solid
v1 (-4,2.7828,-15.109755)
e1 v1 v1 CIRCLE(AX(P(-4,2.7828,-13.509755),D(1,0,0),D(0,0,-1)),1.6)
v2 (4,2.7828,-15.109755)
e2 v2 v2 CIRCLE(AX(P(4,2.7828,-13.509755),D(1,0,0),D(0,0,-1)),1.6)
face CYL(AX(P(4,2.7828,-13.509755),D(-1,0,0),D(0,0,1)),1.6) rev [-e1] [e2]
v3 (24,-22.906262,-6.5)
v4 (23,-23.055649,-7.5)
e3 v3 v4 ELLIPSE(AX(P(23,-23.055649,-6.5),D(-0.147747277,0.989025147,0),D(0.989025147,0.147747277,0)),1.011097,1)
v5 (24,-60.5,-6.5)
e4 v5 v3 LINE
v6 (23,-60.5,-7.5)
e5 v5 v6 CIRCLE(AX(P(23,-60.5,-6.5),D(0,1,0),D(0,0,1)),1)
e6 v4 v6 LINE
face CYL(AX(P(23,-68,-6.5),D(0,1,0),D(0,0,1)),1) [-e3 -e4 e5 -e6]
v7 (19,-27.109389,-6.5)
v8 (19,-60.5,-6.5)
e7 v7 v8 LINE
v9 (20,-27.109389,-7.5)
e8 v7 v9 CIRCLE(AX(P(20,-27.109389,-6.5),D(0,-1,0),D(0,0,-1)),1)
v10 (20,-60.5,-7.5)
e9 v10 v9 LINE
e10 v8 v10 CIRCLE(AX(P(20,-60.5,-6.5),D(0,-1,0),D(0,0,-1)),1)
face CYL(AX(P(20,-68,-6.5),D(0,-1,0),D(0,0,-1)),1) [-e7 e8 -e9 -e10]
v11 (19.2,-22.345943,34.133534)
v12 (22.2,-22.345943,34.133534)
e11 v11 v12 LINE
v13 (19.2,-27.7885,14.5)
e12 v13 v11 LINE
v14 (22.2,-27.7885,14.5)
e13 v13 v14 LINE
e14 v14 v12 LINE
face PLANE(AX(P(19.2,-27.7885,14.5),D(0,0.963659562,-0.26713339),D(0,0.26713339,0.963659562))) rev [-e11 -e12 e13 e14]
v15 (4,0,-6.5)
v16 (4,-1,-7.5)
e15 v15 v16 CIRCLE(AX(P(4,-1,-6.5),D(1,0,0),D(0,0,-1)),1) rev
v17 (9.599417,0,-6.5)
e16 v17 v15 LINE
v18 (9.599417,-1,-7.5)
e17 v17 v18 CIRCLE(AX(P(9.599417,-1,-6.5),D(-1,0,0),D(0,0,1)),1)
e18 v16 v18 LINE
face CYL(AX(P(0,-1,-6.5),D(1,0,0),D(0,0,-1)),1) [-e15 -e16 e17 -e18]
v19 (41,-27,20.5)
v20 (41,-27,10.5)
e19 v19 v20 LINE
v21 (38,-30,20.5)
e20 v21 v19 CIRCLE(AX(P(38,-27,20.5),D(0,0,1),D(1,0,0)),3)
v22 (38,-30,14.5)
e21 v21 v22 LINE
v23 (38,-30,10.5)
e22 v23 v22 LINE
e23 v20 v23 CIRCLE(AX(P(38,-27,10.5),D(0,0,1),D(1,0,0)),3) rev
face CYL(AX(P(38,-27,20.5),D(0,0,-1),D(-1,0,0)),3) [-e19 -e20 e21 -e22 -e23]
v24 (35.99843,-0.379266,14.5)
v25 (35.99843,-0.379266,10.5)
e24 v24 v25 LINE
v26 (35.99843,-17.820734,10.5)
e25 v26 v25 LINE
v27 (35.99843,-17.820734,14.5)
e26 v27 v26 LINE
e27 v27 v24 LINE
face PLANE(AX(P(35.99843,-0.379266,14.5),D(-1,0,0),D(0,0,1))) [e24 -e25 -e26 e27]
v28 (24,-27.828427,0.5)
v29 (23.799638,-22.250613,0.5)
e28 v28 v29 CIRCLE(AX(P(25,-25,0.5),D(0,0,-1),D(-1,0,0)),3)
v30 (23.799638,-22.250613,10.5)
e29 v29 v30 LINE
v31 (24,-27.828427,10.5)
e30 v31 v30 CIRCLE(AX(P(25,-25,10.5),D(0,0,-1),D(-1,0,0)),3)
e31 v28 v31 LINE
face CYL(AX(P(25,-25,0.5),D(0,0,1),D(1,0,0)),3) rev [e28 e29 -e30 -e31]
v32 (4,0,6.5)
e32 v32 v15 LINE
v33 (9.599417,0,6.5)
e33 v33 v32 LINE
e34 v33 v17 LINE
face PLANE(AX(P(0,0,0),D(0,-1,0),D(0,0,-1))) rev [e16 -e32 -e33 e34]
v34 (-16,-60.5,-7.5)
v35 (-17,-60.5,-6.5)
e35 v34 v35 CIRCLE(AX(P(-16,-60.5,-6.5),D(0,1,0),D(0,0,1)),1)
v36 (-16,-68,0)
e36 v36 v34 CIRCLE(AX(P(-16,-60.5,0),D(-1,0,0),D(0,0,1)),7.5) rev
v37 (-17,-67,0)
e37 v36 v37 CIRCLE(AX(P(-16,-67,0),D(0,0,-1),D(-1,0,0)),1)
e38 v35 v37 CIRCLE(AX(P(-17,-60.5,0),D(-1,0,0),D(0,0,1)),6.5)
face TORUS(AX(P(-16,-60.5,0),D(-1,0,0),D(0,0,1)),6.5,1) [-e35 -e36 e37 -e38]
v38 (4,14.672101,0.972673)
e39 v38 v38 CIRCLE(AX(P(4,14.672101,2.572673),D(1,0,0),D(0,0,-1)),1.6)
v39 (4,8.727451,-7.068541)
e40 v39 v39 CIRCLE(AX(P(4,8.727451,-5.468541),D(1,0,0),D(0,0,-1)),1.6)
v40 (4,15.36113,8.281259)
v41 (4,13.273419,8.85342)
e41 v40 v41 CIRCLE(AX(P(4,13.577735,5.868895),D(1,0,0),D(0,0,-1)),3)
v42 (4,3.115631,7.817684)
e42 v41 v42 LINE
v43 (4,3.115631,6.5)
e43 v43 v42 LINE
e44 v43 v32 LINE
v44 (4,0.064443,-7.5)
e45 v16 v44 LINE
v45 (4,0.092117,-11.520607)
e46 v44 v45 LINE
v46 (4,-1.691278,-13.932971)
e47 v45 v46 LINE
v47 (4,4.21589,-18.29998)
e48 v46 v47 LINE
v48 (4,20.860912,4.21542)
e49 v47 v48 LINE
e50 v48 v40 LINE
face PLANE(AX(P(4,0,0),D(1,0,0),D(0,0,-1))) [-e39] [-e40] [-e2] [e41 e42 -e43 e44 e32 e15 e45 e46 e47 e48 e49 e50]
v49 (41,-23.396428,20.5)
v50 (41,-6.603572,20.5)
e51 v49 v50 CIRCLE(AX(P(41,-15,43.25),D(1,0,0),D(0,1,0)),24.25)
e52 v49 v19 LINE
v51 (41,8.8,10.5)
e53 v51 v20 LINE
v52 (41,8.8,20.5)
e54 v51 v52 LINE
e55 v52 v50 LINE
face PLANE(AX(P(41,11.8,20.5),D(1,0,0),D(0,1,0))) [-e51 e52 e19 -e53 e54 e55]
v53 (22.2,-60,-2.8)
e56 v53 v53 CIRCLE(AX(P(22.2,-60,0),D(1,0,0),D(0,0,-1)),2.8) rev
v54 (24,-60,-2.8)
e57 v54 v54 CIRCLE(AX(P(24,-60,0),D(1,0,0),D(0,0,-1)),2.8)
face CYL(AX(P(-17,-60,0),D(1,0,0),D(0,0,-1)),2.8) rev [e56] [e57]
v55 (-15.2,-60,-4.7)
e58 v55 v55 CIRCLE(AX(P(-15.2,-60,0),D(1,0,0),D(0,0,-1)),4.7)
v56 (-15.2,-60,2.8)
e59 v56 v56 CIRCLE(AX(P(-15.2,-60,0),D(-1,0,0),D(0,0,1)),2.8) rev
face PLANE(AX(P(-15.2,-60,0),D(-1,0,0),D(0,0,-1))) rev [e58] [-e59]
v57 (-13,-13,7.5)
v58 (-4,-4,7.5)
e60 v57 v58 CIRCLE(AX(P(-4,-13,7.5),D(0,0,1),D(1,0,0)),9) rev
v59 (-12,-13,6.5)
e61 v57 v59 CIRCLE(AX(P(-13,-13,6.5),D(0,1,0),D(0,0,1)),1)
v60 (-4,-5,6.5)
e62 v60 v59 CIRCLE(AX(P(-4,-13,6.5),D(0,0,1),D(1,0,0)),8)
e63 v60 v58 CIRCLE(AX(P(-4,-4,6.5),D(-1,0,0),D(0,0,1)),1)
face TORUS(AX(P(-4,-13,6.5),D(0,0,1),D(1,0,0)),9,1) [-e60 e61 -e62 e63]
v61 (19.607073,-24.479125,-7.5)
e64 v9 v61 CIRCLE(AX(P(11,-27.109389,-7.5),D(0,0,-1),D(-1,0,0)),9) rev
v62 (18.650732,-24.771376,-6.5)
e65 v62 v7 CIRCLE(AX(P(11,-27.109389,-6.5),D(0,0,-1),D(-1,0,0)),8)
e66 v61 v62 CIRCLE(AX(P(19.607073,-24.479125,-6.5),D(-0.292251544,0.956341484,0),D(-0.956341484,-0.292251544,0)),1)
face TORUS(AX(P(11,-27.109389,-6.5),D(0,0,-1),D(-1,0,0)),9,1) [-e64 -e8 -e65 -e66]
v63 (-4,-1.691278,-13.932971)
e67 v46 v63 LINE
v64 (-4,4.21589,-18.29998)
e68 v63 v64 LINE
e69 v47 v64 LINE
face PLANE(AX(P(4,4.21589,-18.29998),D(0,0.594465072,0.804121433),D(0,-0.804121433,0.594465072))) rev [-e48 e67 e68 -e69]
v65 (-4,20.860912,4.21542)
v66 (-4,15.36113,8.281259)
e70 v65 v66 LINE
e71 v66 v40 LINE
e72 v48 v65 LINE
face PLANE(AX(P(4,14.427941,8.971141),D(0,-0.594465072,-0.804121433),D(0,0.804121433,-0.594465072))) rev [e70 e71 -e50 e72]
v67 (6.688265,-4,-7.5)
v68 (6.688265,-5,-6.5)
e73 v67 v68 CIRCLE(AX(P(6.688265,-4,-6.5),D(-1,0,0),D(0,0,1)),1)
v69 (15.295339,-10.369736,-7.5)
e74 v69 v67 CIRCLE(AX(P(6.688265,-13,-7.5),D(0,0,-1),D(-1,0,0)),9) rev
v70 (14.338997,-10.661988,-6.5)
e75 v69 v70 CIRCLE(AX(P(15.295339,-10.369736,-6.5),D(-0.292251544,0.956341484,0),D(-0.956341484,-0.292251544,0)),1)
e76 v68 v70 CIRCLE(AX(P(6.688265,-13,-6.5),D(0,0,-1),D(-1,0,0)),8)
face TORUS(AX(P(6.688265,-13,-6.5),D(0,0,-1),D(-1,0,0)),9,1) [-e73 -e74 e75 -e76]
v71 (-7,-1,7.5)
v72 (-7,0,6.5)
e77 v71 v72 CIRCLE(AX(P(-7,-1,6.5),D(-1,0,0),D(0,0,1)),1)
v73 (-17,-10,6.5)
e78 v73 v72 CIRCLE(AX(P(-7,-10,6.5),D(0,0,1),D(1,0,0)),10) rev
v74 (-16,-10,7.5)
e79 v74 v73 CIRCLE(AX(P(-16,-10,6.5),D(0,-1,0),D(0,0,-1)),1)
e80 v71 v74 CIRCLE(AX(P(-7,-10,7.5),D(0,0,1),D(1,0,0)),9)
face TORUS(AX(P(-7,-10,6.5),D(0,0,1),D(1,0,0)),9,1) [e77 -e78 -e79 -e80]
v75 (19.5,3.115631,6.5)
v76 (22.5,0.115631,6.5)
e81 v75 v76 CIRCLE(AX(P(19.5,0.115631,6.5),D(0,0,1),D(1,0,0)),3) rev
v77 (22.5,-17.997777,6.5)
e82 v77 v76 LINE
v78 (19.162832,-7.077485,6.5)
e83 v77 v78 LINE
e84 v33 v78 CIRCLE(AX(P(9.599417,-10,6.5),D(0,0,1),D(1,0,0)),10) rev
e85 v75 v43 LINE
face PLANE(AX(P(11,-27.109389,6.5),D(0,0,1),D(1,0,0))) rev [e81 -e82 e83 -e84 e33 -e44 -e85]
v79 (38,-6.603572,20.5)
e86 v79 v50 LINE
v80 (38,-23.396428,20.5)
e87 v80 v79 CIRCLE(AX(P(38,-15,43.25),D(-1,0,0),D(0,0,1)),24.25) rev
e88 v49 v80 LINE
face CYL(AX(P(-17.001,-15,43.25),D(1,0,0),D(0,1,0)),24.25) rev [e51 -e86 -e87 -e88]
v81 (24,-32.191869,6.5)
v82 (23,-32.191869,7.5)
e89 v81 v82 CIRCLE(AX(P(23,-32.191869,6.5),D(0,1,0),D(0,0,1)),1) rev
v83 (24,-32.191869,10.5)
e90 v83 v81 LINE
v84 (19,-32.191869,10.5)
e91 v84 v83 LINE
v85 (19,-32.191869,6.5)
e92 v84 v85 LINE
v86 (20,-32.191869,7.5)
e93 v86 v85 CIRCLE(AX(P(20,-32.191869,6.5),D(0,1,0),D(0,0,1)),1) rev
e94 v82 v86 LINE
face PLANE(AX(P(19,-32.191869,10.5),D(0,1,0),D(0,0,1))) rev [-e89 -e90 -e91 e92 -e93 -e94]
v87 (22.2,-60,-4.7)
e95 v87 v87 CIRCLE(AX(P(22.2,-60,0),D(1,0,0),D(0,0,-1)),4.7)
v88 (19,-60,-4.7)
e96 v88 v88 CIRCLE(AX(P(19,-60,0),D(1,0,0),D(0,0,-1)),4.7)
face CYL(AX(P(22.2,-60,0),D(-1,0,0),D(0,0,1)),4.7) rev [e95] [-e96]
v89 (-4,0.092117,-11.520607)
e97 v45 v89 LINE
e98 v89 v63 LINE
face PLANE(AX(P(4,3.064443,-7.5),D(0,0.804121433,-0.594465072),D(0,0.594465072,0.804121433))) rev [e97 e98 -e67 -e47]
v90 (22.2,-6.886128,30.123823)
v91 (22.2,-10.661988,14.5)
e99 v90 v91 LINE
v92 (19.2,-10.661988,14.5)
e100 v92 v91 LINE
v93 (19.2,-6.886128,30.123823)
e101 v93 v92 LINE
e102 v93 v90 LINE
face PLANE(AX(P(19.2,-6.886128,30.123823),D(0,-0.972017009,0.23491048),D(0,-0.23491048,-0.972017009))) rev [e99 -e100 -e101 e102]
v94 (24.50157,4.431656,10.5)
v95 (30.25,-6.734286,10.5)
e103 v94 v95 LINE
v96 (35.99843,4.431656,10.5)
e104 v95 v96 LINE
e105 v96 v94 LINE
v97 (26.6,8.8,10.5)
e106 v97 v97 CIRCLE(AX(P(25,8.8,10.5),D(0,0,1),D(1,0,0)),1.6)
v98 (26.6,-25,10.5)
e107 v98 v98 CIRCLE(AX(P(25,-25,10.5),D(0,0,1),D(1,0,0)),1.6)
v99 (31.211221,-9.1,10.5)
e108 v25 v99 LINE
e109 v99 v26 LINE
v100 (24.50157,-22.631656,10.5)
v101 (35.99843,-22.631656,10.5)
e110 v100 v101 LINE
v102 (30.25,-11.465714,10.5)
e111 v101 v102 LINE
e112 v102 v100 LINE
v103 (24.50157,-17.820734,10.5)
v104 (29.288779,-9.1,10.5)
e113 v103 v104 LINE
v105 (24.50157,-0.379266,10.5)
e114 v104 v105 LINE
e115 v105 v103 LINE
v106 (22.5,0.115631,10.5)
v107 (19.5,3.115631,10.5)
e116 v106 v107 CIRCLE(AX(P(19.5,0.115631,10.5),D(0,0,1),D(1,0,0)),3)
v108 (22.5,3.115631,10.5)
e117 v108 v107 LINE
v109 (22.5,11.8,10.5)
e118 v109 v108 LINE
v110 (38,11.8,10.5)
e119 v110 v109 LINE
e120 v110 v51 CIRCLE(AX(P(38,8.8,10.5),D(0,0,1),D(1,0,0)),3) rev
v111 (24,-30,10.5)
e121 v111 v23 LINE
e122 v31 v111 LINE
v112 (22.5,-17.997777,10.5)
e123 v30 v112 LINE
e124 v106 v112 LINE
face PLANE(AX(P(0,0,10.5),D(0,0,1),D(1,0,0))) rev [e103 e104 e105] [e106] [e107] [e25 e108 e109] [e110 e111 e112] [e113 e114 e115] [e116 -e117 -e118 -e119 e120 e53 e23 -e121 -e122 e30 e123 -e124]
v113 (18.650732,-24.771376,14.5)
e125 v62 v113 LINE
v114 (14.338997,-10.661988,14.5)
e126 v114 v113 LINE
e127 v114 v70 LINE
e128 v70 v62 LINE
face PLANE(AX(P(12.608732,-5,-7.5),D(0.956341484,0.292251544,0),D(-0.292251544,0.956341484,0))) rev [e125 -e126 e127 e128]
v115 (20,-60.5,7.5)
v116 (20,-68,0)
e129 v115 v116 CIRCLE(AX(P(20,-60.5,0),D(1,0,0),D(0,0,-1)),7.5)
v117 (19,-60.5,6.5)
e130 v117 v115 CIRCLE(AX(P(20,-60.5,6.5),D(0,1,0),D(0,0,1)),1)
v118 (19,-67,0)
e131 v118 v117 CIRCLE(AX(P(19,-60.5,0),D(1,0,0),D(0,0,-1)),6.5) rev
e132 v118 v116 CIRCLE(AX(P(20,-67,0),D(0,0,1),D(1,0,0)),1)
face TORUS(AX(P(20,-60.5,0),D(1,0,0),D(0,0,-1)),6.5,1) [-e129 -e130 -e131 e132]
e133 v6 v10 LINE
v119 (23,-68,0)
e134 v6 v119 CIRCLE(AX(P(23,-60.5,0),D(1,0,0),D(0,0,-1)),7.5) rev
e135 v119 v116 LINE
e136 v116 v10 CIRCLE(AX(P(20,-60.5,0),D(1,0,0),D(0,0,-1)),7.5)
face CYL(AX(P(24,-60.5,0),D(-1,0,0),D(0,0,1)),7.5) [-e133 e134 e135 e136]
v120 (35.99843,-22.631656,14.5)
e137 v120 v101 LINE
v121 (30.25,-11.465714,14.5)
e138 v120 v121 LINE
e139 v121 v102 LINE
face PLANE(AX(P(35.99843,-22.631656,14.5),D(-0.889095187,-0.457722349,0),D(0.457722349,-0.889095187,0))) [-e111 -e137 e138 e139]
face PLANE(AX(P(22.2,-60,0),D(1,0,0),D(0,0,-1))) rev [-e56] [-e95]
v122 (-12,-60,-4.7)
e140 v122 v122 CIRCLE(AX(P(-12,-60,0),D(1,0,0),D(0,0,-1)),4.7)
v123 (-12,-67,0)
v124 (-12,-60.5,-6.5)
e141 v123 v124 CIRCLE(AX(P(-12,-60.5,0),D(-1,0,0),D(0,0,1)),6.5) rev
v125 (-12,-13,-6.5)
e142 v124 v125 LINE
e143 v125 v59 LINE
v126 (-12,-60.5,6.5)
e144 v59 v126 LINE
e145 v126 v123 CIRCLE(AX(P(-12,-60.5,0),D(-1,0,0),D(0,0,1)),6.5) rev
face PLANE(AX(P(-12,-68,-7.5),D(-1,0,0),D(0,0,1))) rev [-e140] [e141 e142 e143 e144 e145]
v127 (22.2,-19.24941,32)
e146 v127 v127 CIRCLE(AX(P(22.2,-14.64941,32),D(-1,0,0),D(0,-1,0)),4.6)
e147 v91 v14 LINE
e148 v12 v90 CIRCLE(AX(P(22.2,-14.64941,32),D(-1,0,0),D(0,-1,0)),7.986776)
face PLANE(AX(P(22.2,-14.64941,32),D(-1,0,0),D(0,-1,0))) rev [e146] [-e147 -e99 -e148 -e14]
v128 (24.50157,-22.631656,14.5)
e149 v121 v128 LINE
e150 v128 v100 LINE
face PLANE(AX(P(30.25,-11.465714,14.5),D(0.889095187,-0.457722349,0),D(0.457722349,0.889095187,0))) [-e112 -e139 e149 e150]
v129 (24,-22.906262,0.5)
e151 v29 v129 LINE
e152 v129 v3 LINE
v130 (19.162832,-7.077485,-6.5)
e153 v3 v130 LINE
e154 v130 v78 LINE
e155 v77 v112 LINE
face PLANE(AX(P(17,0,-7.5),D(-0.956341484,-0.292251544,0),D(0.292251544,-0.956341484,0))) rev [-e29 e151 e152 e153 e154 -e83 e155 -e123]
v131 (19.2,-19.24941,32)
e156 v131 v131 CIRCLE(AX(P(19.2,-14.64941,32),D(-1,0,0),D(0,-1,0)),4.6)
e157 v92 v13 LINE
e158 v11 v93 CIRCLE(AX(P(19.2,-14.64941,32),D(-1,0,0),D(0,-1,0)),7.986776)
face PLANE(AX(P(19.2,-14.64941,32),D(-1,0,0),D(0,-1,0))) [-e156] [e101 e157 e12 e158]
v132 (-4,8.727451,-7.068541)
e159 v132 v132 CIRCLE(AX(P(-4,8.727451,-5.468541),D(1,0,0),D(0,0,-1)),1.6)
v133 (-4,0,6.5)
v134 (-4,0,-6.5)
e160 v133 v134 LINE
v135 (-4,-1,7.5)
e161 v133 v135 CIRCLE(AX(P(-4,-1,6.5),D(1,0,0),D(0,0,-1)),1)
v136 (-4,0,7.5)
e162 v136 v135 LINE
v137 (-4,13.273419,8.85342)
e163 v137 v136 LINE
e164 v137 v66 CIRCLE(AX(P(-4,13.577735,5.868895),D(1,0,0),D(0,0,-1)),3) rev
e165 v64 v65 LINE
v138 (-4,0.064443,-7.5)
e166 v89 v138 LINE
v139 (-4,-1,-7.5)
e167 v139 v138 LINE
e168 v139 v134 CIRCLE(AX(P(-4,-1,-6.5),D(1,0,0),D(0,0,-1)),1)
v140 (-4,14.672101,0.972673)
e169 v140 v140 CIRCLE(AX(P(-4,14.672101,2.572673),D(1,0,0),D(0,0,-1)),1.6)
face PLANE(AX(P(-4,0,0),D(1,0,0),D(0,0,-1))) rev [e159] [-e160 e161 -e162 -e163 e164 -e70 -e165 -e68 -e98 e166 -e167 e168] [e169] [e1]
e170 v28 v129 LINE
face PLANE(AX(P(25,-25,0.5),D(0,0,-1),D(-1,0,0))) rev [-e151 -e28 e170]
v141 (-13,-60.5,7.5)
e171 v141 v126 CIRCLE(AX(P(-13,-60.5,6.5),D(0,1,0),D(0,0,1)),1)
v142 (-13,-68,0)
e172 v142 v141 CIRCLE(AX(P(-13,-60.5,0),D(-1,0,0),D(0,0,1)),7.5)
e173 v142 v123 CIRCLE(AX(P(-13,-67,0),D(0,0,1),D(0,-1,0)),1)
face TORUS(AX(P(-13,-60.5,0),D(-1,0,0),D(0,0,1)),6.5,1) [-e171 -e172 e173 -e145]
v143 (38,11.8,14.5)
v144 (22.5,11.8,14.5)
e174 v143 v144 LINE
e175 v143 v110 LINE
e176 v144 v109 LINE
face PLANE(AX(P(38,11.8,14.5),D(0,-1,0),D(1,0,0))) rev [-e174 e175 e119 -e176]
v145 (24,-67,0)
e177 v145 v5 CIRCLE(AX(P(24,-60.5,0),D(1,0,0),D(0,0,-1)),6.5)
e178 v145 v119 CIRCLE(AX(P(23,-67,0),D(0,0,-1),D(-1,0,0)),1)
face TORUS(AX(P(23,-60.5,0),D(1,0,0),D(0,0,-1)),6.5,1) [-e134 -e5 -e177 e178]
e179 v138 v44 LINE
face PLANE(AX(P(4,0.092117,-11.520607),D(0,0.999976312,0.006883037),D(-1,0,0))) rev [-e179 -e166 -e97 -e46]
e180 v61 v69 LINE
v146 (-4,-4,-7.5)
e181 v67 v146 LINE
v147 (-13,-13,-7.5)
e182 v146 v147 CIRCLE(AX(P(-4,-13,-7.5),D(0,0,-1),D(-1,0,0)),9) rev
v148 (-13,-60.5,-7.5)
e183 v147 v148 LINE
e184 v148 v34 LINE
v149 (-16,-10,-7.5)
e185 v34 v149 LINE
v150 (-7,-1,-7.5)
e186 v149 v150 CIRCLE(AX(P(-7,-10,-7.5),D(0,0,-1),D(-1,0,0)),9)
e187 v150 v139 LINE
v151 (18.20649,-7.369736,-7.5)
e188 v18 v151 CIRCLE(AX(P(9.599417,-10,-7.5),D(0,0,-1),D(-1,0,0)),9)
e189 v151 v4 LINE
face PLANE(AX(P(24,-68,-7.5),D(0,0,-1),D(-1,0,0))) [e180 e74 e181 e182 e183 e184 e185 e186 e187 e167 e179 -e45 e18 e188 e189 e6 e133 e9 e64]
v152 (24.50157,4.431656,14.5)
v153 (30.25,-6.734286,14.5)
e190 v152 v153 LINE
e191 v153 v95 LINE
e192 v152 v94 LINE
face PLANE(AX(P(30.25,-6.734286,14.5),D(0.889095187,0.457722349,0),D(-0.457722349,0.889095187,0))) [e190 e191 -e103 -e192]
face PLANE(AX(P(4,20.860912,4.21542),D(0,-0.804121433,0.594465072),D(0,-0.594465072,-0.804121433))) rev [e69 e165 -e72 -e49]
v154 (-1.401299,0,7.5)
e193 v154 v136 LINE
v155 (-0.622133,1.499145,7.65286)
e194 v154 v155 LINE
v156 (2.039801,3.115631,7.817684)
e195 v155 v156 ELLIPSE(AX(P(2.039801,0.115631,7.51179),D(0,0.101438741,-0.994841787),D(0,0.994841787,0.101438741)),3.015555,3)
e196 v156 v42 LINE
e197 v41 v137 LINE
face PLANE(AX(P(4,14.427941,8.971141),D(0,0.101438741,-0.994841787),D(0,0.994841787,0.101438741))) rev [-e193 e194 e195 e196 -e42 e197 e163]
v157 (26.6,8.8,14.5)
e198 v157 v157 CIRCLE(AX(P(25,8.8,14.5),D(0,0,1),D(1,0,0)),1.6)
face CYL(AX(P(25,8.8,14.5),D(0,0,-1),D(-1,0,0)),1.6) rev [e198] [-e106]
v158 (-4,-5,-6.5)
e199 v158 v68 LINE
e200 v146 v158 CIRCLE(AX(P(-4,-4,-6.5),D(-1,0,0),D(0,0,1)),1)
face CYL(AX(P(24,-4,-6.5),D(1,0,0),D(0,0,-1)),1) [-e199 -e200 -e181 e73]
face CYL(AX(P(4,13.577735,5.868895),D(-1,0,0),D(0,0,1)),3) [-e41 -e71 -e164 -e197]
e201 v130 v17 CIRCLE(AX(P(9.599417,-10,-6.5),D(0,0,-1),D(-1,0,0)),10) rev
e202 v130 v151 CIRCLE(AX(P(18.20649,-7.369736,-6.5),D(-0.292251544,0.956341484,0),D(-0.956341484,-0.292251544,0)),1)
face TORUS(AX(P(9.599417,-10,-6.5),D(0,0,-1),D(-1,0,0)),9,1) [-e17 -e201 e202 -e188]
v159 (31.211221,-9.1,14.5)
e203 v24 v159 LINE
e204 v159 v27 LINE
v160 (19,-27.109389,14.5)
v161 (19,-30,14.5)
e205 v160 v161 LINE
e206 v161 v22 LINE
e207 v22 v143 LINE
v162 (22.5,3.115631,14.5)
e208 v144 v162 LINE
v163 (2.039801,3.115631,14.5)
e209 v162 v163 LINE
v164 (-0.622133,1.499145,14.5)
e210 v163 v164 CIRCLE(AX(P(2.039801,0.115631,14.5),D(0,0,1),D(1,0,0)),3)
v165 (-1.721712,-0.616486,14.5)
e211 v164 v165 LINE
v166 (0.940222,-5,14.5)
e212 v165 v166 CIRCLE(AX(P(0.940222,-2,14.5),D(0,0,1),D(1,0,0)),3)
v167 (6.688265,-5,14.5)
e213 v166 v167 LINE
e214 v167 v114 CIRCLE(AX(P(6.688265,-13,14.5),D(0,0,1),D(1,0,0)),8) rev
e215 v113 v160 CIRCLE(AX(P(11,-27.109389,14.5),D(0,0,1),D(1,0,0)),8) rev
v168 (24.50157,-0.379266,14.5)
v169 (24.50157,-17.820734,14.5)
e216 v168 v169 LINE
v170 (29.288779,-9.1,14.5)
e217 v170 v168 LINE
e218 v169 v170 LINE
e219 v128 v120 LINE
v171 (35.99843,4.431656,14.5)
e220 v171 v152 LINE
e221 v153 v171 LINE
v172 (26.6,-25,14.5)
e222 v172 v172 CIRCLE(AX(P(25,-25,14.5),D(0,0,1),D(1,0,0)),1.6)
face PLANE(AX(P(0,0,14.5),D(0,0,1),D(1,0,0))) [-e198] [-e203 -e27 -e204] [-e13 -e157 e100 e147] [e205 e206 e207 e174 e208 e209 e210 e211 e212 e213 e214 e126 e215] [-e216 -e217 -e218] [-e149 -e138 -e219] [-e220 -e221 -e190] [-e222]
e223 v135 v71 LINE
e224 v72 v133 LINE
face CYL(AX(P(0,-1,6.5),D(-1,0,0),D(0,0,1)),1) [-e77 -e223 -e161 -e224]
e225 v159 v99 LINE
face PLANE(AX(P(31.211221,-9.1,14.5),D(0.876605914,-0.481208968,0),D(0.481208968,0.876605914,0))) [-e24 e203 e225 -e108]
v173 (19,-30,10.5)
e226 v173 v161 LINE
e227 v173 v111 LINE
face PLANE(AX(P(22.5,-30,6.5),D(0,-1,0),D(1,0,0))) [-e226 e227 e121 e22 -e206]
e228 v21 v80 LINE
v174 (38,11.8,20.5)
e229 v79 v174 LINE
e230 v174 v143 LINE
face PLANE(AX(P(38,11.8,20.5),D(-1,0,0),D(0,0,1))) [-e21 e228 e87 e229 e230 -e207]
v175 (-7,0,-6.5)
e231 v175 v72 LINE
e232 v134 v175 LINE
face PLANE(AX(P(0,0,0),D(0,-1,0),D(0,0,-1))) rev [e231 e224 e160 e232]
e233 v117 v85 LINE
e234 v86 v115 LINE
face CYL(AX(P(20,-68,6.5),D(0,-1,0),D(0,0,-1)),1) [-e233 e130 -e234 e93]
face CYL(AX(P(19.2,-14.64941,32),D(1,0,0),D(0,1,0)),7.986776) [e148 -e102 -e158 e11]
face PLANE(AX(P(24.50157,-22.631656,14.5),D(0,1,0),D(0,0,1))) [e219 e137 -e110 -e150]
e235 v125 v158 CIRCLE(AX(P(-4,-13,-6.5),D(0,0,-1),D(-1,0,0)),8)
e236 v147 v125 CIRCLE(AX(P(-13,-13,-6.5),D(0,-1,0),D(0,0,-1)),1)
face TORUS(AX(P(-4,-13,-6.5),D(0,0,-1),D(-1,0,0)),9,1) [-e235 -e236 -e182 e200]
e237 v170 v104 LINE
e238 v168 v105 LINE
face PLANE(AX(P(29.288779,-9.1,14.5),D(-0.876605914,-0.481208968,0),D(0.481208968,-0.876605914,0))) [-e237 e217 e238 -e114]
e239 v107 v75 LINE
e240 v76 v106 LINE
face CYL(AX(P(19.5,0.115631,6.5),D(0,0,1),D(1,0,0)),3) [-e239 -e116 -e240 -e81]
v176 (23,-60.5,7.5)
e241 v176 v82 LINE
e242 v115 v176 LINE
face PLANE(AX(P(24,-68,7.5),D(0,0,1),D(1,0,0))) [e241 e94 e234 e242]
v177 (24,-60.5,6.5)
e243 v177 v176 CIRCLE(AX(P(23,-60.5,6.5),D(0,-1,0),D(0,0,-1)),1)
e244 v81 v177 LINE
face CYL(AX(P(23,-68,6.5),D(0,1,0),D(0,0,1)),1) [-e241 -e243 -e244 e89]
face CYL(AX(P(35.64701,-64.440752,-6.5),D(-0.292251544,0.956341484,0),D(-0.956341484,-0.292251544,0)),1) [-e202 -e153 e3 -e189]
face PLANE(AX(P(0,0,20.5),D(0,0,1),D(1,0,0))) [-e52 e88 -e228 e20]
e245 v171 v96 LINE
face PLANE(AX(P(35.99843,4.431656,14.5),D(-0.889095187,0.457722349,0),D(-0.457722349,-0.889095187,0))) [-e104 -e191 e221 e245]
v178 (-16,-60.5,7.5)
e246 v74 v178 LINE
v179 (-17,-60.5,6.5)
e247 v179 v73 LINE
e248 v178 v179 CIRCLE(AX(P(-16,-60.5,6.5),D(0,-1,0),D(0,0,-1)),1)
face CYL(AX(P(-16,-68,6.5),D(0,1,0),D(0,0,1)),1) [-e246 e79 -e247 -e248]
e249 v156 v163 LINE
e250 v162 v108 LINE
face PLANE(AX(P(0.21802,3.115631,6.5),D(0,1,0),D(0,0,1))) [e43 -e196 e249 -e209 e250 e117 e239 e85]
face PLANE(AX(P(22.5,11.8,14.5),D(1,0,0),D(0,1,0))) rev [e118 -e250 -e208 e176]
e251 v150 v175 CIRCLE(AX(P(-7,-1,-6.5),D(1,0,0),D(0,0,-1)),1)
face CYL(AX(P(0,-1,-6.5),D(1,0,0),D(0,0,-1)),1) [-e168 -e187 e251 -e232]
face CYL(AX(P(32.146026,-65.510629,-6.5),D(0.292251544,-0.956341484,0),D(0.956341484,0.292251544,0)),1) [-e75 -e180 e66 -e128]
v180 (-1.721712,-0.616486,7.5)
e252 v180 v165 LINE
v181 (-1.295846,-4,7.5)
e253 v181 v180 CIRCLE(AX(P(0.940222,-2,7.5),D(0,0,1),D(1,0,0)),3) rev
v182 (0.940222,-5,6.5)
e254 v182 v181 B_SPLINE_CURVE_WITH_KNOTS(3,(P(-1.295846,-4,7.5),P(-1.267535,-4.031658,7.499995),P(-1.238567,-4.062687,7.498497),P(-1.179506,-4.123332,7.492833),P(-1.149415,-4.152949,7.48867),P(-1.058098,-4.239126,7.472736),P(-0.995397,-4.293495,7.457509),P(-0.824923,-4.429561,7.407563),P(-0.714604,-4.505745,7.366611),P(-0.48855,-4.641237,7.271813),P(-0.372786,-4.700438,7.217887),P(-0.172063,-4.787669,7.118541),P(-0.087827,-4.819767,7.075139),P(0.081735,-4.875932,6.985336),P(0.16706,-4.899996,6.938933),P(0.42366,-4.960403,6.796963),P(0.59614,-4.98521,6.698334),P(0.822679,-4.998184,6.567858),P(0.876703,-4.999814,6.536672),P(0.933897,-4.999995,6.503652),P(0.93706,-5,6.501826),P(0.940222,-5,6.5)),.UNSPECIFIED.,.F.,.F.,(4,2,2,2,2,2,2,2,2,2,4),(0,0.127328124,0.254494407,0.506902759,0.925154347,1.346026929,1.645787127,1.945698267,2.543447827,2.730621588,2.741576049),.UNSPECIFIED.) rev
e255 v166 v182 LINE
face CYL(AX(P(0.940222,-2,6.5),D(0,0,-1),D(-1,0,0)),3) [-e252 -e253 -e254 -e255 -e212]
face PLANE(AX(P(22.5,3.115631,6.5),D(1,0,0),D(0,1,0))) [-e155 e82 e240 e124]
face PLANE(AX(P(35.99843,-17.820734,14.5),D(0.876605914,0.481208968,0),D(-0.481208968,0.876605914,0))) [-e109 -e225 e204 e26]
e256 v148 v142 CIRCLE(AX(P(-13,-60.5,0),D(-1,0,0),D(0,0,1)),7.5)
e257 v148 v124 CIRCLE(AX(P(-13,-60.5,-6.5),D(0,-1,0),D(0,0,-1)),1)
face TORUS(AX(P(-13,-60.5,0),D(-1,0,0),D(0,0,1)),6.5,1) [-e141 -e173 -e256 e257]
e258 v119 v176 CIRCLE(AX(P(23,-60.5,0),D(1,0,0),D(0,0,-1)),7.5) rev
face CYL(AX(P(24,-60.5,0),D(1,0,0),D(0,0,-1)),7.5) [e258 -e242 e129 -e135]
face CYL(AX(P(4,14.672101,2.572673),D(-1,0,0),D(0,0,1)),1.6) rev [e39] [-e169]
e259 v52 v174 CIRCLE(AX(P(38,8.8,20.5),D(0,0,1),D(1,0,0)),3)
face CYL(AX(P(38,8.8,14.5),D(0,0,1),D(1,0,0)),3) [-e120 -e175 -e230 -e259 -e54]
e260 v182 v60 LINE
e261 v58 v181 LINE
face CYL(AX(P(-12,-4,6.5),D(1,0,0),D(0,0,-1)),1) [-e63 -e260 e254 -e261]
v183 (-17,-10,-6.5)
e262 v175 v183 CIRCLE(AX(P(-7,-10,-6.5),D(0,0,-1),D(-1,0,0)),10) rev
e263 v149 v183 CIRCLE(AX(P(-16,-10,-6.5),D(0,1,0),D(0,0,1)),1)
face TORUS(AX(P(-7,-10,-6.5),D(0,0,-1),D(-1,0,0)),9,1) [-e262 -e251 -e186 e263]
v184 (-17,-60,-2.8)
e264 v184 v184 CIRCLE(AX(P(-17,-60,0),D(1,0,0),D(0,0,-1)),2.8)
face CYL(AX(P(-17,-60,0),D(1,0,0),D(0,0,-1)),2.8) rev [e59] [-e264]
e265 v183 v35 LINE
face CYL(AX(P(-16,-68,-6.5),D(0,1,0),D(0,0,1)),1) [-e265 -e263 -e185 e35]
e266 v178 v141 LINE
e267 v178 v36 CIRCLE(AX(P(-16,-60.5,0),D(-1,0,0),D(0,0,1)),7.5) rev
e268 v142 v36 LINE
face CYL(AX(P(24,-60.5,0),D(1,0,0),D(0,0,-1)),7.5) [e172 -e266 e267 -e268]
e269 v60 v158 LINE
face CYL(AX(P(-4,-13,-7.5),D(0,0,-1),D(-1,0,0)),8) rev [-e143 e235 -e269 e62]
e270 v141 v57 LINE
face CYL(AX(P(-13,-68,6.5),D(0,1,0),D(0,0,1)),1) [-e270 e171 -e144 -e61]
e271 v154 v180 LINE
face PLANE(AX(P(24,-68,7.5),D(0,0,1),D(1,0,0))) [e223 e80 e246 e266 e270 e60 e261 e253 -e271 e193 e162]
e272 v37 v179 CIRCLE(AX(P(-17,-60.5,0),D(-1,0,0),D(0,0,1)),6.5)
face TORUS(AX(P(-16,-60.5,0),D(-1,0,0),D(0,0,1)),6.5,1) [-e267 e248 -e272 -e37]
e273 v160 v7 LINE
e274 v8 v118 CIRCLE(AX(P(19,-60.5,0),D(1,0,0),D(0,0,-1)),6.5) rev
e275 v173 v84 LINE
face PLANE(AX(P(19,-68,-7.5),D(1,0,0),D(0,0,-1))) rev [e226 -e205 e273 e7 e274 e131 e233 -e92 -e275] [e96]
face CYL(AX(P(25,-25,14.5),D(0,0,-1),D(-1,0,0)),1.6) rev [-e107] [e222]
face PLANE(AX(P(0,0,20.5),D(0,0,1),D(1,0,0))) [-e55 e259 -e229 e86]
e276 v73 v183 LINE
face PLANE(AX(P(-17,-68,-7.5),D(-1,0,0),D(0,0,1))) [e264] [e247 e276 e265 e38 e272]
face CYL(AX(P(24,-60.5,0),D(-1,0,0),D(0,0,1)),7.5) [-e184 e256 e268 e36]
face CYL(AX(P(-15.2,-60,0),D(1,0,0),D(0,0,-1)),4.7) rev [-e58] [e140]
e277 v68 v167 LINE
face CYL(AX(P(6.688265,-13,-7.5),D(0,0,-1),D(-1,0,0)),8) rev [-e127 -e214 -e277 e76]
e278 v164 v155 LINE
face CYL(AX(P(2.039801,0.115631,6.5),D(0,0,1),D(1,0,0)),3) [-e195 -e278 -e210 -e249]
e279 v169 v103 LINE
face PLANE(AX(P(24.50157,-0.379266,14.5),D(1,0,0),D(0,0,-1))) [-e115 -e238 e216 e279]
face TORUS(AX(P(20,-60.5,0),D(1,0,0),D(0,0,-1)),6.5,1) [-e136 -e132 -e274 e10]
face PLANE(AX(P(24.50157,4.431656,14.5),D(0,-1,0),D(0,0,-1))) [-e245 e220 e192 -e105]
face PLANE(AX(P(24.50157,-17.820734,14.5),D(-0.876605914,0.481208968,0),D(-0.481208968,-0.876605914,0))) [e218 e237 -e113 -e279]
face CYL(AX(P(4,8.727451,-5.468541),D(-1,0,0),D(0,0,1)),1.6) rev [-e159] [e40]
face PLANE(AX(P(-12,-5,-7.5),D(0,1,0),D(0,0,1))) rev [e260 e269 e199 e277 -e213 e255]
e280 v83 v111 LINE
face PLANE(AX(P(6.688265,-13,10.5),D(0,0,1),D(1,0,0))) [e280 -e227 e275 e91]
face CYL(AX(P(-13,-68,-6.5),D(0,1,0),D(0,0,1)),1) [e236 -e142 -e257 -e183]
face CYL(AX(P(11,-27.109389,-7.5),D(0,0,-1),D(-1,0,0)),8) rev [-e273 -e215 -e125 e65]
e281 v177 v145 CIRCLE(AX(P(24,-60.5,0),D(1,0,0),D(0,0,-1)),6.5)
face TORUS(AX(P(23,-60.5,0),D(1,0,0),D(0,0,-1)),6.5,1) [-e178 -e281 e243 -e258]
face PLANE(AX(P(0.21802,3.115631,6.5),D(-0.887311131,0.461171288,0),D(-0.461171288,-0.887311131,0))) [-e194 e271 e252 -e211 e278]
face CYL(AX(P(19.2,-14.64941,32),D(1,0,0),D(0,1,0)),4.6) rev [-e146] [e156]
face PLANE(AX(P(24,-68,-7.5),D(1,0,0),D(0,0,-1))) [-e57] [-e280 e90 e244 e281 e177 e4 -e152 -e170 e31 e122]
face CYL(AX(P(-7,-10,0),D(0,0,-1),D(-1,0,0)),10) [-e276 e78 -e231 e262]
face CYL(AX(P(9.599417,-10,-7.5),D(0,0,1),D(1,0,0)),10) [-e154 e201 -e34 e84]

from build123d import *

# Parameters (mm, degrees)
SKETCH_1_W                  = 41
SKETCH_1_H                  = 15
EXTRUDE_1_DEPTH             = 68
CUT_EXTRUDE_1_DEPTH         = 74.654599313
FILLET_1_R                  = 8
FILLET_3_R                  = 7.5
SKETCH_4_R                  = 2.8
CUT_EXTRUDE_2_DEPTH         = 80.757444794
SKETCH_6_R                  = 4.7
CUT_EXTRUDE_4_DEPTH         = 3.2
SKETCH_7_R                  = 1.6
EXTRUDE_2_DEPTH             = 4
CHAMFER_1_SIZE              = 3
CHAMFER_1_SIZE2             = 5
FILLET_4_R                  = 10
FILLET_2_R                  = 1
EXTRUDE_9_DEPTH             = 3
SKETCH_9_W                  = 15.5
SKETCH_9_H                  = 41.8
SKETCH_9_R                  = 1.6
EXTRUDE_3_DEPTH             = 4
EXTRUDE_5_REACH             = 85.051
EXTRUDE_5_DIRECTION_2_DEPTH = 4
SKETCH_11_W                 = 3
SKETCH_11_H                 = 41.8
EXTRUDE_6_DEPTH             = 10
SKETCH_13_R                 = 3
CUT_EXTRUDE_5_DEPTH         = 10
CUT_EXTRUDE_6_REACH         = 93.697
SKETCH_14_R                 = 24.25
FILLET_START                = 6.5
FILLET_5_DEPTH              = 8
FILLET_5_2_DEPTH            = 4
FILLET_START_2              = 7.652859874
FILLET_5_3_DEPTH            = 6.847140126
FILLET_START_3              = -5
FILLET_5_4_DEPTH            = 24
FILLET_START_4              = -0.804471856
FILLET_5_5_DEPTH            = 3.959511856
FILLET_START_5              = -4.0000001
FILLET_5_6_DEPTH            = 6.0000001
FILLET_START_6              = 10
FILLET_5_7_DEPTH            = 10.5
SKETCH_15_R                 = 4.6
EXTRUDE_7_DEPTH             = 3


with BuildPart() as part:
    # 草图1 → 凸台-拉伸1 (new body)
    with BuildSketch(Plane(origin=(0, 0, 0), x_dir=(1, 0, 0), z_dir=(0, 1, 0))):
        with Locations((3.5, 0)):
            Rectangle(SKETCH_1_W, SKETCH_1_H)
    extrude(amount=-EXTRUDE_1_DEPTH)

    # 草图3 → 切除-拉伸1 (cut, through all)
    with BuildSketch(Plane.XY.offset(7.5)):
        Polygon((-12, -68), (19, -68), (19, -25.914294311), (12.608731909, -5), (-12, -5), align=None)
        Polygon((17, 0), (27.489114219, -34.323770918), (27.489114219, 0), align=None)
    extrude(amount=-CUT_EXTRUDE_1_DEPTH, mode=Mode.SUBTRACT)

    # 圆角1
    fillet_1_edges = [part.edges().sort_by_distance(p)[0] for p in [
        (-12, -5, 0),
        (12.608731909, -5, 0),
        (19, -25.914294311, 0),
    ]]
    fillet(fillet_1_edges, radius=FILLET_1_R)

    # 圆角3
    fillet_3_edges = [part.edges().sort_by_distance(p)[0] for p in [
        (21.5, -68, -7.5),
        (21.5, -68, 7.5),
        (-14.5, -68, -7.5),
        (-14.5, -68, 7.5),
    ]]
    fillet(fillet_3_edges, radius=FILLET_3_R - 0.0001)  # a hair under: the kernel refuses the full size

    # 草图4 → 切除-拉伸2 (cut, through all)
    with BuildSketch(Plane(origin=(24, 0, 0), x_dir=(0, 0, -1), z_dir=(1, 0, 0))):
        with Locations((0, -60)):
            Circle(SKETCH_4_R)
    extrude(amount=-CUT_EXTRUDE_2_DEPTH, mode=Mode.SUBTRACT)

    # 草图6 → 切除-拉伸4 (cut)
    with BuildSketch(Plane(origin=(19, 0, 0), x_dir=(0, 0, -1), z_dir=(1, 0, 0))):
        with Locations((0, -60)):
            Circle(SKETCH_6_R)
    cut_extrude_4 = extrude(amount=CUT_EXTRUDE_4_DEPTH, mode=Mode.SUBTRACT)

    # 镜向2: 切除-拉伸4 across plane
    add(cut_extrude_4.mirror(Plane(origin=(3.5, 0, 0), x_dir=(0, 0, 1), z_dir=(1, 0, 0))), mode=Mode.SUBTRACT)

    # 草图7 → 凸台-拉伸2 (add, symmetric)
    with BuildSketch(Plane(origin=(0, 0, 0), x_dir=(0, 0, -1), z_dir=(1, 0, 0))):
        Polygon((-4.21542005, 20.860912491), (-8.971140622, 14.427941029), (-7.5, 0), (7.5, 0), (7.5, 3.064442774), (13.932971462, -1.691277798), (18.299980069, 4.215890487), align=None)
        with Locations((13.509755484, 2.782799971)):
            Circle(SKETCH_7_R, mode=Mode.SUBTRACT)
        with Locations((5.468541156, 8.727450686)):
            Circle(SKETCH_7_R, mode=Mode.SUBTRACT)
        with Locations((-2.572673172, 14.672101402)):
            Circle(SKETCH_7_R, mode=Mode.SUBTRACT)
    extrude(amount=EXTRUDE_2_DEPTH, both=True)

    # 倒角1
    chamfer_1_edges = [part.edges().sort_by_distance(p)[0] for p in [
        (0, 3.064442774, -7.5),
    ]]
    chamfer_1_side = [part.faces().sort_by_distance(p)[0] for p in [
        (-12.756402743, -36.75005, -7.5),
    ]]
    chamfer(chamfer_1_edges, length=CHAMFER_1_SIZE, length2=CHAMFER_1_SIZE2, reference=chamfer_1_side[0])

    # 圆角4
    fillet_4_edges = [part.edges().sort_by_distance(p)[0] for p in [
        (17, 0, 0),
        (-17, 0, 0),
    ]]
    fillet(fillet_4_edges, radius=FILLET_4_R)

    # 圆角2
    fillet_2_edges = [part.edges().sort_by_distance(p)[0] for p in [
        (6.799708487, 0, 7.5),
        (-5.5, 0, -7.5),
        (21.581415909, -14.991873182, -7.5),
        (21.581415909, -14.991873182, 7.5),
        (-5.5, 0, 7.5),
        (-14.071067812, -2.928932188, 7.5),
        (15.548149847, -1.961805102, 7.5),
        (6.799708487, 0, -7.5),
        (-14.071067812, -2.928932188, -7.5),
        (15.548149847, -1.961805102, -7.5),
        (16.49486462, -17.716681899, 7.5),
        (16.49486462, -17.716681899, -7.5),
        (1.344132744, -5, 7.5),
        (1.344132744, -5, -7.5),
        (-12, -36.75005, 7.5),
        (-12, -36.75005, -7.5),
        (18.912201179, -25.927410294, 7.5),
        (18.912201179, -25.927410294, -7.5),
        (11.447251786, -6.569444081, 7.5),
        (11.447251786, -6.569444081, -7.5),
        (-9.656854249, -7.343145751, 7.5),
        (-9.656854249, -7.343145751, -7.5),
        (24, -41.703180904, -7.5),
        (19, -43.804744254, -7.5),
        (-17, -35.25005, -7.5),
        (19, -43.804744254, 7.5),
        (19, -65.803330148, 5.303330148),
        (19, -65.803330148, -5.303330148),
        (24, -41.703180904, 7.5),
        (24, -65.803330148, 5.303330148),
        (24, -65.803330148, -5.303330148),
        (-17, -35.25005, 7.5),
        (-17, -65.803330148, 5.303330148),
        (-17, -65.803330148, -5.303330148),
        (-12, -65.803330148, 5.303330148),
        (-12, -65.803330148, -5.303330148),
    ]]
    fillet(fillet_2_edges, radius=FILLET_2_R)

    # 草图16 → 凸台-拉伸9 (add, symmetric)
    with BuildSketch(Plane.XY.offset(7.5)):
        with BuildLine():
            Line((6.688265489, -5), (4, -5))
            Line((4, -5), (4, 0))
            Line((4, 0), (9.599416975, 0))
            ThreePointArc((9.599416975, 0), (15.548149847, -1.961805102), (19.162831819, -7.077484556))
            Line((19.162831819, -7.077484556), (24, -22.906261808))
            Line((24, -22.906261808), (24, -32.19186866))
            Line((24, -32.19186866), (19, -32.19186866))
            Line((19, -32.19186866), (19, -27.109388508))
            ThreePointArc((19, -27.109388508), (18.912201179, -25.927410294), (18.650731875, -24.771376153))
            Line((18.650731875, -24.771376153), (14.338997364, -10.661987644))
            ThreePointArc((14.338997364, -10.661987644), (11.447251786, -6.569444081), (6.688265489, -5))
        make_face()
    extrude(amount=EXTRUDE_9_DEPTH, both=True)


with BuildPart() as body_2:
    # 草图9 → 凸台-拉伸3 (new body)
    with BuildSketch(Plane(origin=(0, 5.628221735, 10.5), x_dir=(1, 0, 0), z_dir=(0, 0, 1))):
        with Locations((30.25, -14.728221735)):
            Rectangle(SKETCH_9_W, SKETCH_9_H)
        with Locations((25, 3.171778265)):
            Circle(SKETCH_9_R, mode=Mode.SUBTRACT)
        with Locations((25, -30.628221735)):
            Circle(SKETCH_9_R, mode=Mode.SUBTRACT)
        Polygon((30.25, -12.362507958), (24.501570259, -1.196565922), (35.998429741, -1.196565922), align=None, mode=Mode.SUBTRACT)
        Polygon((35.998429741, -28.259877548), (30.25, -17.093935512), (24.501570259, -28.259877548), align=None, mode=Mode.SUBTRACT)
        Polygon((29.288779045, -14.728221735), (24.501570259, -6.007487482), (24.501570259, -23.448955989), align=None, mode=Mode.SUBTRACT)
        Polygon((35.998429741, -6.007487482), (35.998429741, -23.448955989), (31.211220955, -14.728221735), align=None, mode=Mode.SUBTRACT)
    extrude(amount=EXTRUDE_3_DEPTH)

    # 凸台-拉伸5: up to this face of the body (flat: up to its plane)
    extrude_5_end = Plane(body_2.part.faces().sort_by_distance((30.451087866, -9.138302451, 14.5))[0])
    # 草图10 → 凸台-拉伸5 (add, up to the picked face)
    with BuildSketch(Plane.XY.offset(10.5), mode=Mode.PRIVATE) as extrude_5_sk1:
        with BuildLine():
            Line((0.21802001, 3.115631229), (-4, -5))
            Line((-4, -5), (6.688265489, -5))
            ThreePointArc((6.688265489, -5), (11.447251786, -6.569444081), (14.338997364, -10.661987644))
            Line((14.338997364, -10.661987644), (18.650731875, -24.771376153))
            ThreePointArc((18.650731875, -24.771376153), (18.912201179, -25.927410294), (19, -27.109388508))
            Line((19, -27.109388508), (19, -30))
            Line((19, -30), (22.5, -30))
            Line((22.5, -30), (22.5, 3.115631229))
            Line((22.5, 3.115631229), (0.21802001, 3.115631229))
        make_face()
    extrude_5_tool1 = split(extrude(extrude_5_sk1.sketch, amount=EXTRUDE_5_REACH, mode=Mode.PRIVATE), bisect_by=extrude_5_end, keep=Keep.BOTH, mode=Mode.PRIVATE)

    add(part.part)  # 凸台-拉伸5 merges part
    add(extrude_5_tool1.solids().sort_by(Axis((14.08393, -7.198348, 10.5), (0, 0, 1)))[0])

    # 草图10 → 凸台-拉伸5 direction 2 (add)
    with BuildSketch(Plane.XY.offset(10.5)):
        with BuildLine():
            Line((0.21802001, 3.115631229), (-4, -5))
            Line((-4, -5), (6.688265489, -5))
            ThreePointArc((6.688265489, -5), (11.447251786, -6.569444081), (14.338997364, -10.661987644))
            Line((14.338997364, -10.661987644), (18.650731875, -24.771376153))
            ThreePointArc((18.650731875, -24.771376153), (18.912201179, -25.927410294), (19, -27.109388508))
            Line((19, -27.109388508), (19, -30))
            Line((19, -30), (22.5, -30))
            Line((22.5, -30), (22.5, 3.115631229))
            Line((22.5, 3.115631229), (0.21802001, 3.115631229))
        make_face()
    extrude(amount=-EXTRUDE_5_DIRECTION_2_DEPTH)

    # 草图11 → 凸台-拉伸6 (add)
    with BuildSketch(Plane(origin=(0, 0, 10.5), x_dir=(-1, 0, 0), z_dir=(0, 0, -1))):
        with Locations((-39.5, -9.1)):
            Rectangle(SKETCH_11_W, SKETCH_11_H)
    extrude(amount=-EXTRUDE_6_DEPTH)

    # 草图13 → 切除-拉伸5 (cut)
    with BuildSketch(Plane(origin=(0, 0, 10.5), x_dir=(-1, 0, 0), z_dir=(0, 0, -1))):
        with Locations((-25, -25)):
            Circle(SKETCH_13_R)
    extrude(amount=CUT_EXTRUDE_5_DEPTH, mode=Mode.SUBTRACT)

    # 草图14 → 切除-拉伸6 (cut, up to next)
    with BuildSketch(Plane(origin=(41, 0, 0), x_dir=(0, 0, -1), z_dir=(1, 0, 0)), mode=Mode.PRIVATE) as cut_extrude_6_sk1:
        with Locations((-43.25, -15)):
            Circle(SKETCH_14_R)
    cut_extrude_6_tool1 = extrude(cut_extrude_6_sk1.sketch, amount=-CUT_EXTRUDE_6_REACH, mode=Mode.PRIVATE) & body_2.part
    add(cut_extrude_6_tool1.solids().sort_by_distance((41, -15, 43.25))[0], mode=Mode.SUBTRACT)

    # 圆角5: read off the stored shape, not the designer's step
    # 圆角5 outline → 圆角5 (cut)
    with BuildSketch(Plane.XY.offset(FILLET_START)):
        with BuildLine():
            Line((-4, -5), (0.94022188, -5))
            ThreePointArc((0.94022188, -5), (-1.624007204, -3.557154201), (-1.721711514, -0.616486136))
            Line((-1.721711514, -0.616486136), (-4, -5))
        make_face()
    extrude(amount=FILLET_5_DEPTH, mode=Mode.SUBTRACT)

    # Fillet 5 2 outline → Fillet 5 2 (cut)
    with BuildSketch(Plane.XY.offset(FILLET_START)):
        with BuildLine():
            Line((22.5, 3.115631229), (19.5, 3.115631229))
            ThreePointArc((19.5, 3.115631229), (21.621320343, 2.236951573), (22.5, 0.115631229))
            Line((22.5, 0.115631229), (22.5, 3.115631229))
        make_face()
    extrude(amount=FILLET_5_2_DEPTH, mode=Mode.SUBTRACT)

    # Fillet 5 3 outline → Fillet 5 3 (cut)
    with BuildSketch(Plane.XY.offset(FILLET_START_2)):
        with BuildLine():
            Line((0.21802001, 3.115631229), (-0.62213286, 1.499145092))
            ThreePointArc((-0.62213286, 1.499145092), (0.482646332, 2.679860313), (2.039800533, 3.115631229))
            Line((2.039800533, 3.115631229), (0.21802001, 3.115631229))
        make_face()
    extrude(amount=FILLET_5_3_DEPTH, mode=Mode.SUBTRACT)

    # Fillet 5 4 outline → Fillet 5 4 (cut)
    with BuildSketch(Plane.YZ.offset(FILLET_START_3)):
        with BuildLine():
            Line((14.427941029, 8.971140622), (13.27341905, 8.85342014))
            ThreePointArc((13.27341905, 8.85342014), (14.370679619, 8.762204174), (15.361130486, 8.281259076))
            Line((15.361130486, 8.281259076), (14.427941029, 8.971140622))
        make_face()
    extrude(amount=FILLET_5_4_DEPTH, mode=Mode.SUBTRACT)

    # Fillet 5 5 outline → Fillet 5 5 (add)
    with BuildSketch(Plane.YZ.offset(FILLET_START_4)):
        Polygon((3.115631229, 7.652859874), (3.115631229, 7.817684391), (1.499145092, 7.652859874), align=None)
    extrude(amount=FILLET_5_5_DEPTH)

    # Fillet 5 6 outline → Fillet 5 6 (add)
    with BuildSketch(Plane.YZ.offset(FILLET_START_5)):
        with BuildLine():
            Line((1, 7.500000003), (-4, 7.5))
            ThreePointArc((-4, 7.5), (-4.707106781, 7.207106781), (-5, 6.5))
            Line((-5, 6.5), (1, 6.5))
            Line((1, 6.5), (1, 7.500000003))
        make_face()
    extrude(amount=FILLET_5_6_DEPTH)

    # Fillet 5 7 outline → Fillet 5 7 (cut)
    with BuildSketch(Plane.XY.offset(FILLET_START_6)):
        with BuildLine():
            ThreePointArc((38, 11.8), (40.121320344, 10.921320344), (41, 8.8))
            Line((41, 8.8), (40.999999981, 11.8))
            Line((40.999999981, 11.8), (38, 11.8))
        make_face()
        with BuildLine():
            Line((40.999999981, -30), (41, -27))
            ThreePointArc((41, -27), (40.121320344, -29.121320344), (38, -30))
            Line((38, -30), (40.999999981, -30))
        make_face()
    extrude(amount=FILLET_5_7_DEPTH, mode=Mode.SUBTRACT)

    # 草图15 → 凸台-拉伸7 (add)
    with BuildSketch(Plane.ZY.offset(-22.2)):
        with BuildLine():
            Line((14.5, -27.788500248), (34.133534465, -22.345942708))
            ThreePointArc((34.133534465, -22.345942708), (39.730978267, -12.644276282), (30.12382269, -6.886128118))
            Line((30.12382269, -6.886128118), (14.5, -10.661987644))
            Line((14.5, -10.661987644), (14.5, -27.788500248))
        make_face()
        with Locations(Location((32, -14.64940994, 0), (0, 0, 270))):
            Circle(SKETCH_15_R, mode=Mode.SUBTRACT)
    extrude(amount=EXTRUDE_7_DEPTH)


solid = body_2.part
